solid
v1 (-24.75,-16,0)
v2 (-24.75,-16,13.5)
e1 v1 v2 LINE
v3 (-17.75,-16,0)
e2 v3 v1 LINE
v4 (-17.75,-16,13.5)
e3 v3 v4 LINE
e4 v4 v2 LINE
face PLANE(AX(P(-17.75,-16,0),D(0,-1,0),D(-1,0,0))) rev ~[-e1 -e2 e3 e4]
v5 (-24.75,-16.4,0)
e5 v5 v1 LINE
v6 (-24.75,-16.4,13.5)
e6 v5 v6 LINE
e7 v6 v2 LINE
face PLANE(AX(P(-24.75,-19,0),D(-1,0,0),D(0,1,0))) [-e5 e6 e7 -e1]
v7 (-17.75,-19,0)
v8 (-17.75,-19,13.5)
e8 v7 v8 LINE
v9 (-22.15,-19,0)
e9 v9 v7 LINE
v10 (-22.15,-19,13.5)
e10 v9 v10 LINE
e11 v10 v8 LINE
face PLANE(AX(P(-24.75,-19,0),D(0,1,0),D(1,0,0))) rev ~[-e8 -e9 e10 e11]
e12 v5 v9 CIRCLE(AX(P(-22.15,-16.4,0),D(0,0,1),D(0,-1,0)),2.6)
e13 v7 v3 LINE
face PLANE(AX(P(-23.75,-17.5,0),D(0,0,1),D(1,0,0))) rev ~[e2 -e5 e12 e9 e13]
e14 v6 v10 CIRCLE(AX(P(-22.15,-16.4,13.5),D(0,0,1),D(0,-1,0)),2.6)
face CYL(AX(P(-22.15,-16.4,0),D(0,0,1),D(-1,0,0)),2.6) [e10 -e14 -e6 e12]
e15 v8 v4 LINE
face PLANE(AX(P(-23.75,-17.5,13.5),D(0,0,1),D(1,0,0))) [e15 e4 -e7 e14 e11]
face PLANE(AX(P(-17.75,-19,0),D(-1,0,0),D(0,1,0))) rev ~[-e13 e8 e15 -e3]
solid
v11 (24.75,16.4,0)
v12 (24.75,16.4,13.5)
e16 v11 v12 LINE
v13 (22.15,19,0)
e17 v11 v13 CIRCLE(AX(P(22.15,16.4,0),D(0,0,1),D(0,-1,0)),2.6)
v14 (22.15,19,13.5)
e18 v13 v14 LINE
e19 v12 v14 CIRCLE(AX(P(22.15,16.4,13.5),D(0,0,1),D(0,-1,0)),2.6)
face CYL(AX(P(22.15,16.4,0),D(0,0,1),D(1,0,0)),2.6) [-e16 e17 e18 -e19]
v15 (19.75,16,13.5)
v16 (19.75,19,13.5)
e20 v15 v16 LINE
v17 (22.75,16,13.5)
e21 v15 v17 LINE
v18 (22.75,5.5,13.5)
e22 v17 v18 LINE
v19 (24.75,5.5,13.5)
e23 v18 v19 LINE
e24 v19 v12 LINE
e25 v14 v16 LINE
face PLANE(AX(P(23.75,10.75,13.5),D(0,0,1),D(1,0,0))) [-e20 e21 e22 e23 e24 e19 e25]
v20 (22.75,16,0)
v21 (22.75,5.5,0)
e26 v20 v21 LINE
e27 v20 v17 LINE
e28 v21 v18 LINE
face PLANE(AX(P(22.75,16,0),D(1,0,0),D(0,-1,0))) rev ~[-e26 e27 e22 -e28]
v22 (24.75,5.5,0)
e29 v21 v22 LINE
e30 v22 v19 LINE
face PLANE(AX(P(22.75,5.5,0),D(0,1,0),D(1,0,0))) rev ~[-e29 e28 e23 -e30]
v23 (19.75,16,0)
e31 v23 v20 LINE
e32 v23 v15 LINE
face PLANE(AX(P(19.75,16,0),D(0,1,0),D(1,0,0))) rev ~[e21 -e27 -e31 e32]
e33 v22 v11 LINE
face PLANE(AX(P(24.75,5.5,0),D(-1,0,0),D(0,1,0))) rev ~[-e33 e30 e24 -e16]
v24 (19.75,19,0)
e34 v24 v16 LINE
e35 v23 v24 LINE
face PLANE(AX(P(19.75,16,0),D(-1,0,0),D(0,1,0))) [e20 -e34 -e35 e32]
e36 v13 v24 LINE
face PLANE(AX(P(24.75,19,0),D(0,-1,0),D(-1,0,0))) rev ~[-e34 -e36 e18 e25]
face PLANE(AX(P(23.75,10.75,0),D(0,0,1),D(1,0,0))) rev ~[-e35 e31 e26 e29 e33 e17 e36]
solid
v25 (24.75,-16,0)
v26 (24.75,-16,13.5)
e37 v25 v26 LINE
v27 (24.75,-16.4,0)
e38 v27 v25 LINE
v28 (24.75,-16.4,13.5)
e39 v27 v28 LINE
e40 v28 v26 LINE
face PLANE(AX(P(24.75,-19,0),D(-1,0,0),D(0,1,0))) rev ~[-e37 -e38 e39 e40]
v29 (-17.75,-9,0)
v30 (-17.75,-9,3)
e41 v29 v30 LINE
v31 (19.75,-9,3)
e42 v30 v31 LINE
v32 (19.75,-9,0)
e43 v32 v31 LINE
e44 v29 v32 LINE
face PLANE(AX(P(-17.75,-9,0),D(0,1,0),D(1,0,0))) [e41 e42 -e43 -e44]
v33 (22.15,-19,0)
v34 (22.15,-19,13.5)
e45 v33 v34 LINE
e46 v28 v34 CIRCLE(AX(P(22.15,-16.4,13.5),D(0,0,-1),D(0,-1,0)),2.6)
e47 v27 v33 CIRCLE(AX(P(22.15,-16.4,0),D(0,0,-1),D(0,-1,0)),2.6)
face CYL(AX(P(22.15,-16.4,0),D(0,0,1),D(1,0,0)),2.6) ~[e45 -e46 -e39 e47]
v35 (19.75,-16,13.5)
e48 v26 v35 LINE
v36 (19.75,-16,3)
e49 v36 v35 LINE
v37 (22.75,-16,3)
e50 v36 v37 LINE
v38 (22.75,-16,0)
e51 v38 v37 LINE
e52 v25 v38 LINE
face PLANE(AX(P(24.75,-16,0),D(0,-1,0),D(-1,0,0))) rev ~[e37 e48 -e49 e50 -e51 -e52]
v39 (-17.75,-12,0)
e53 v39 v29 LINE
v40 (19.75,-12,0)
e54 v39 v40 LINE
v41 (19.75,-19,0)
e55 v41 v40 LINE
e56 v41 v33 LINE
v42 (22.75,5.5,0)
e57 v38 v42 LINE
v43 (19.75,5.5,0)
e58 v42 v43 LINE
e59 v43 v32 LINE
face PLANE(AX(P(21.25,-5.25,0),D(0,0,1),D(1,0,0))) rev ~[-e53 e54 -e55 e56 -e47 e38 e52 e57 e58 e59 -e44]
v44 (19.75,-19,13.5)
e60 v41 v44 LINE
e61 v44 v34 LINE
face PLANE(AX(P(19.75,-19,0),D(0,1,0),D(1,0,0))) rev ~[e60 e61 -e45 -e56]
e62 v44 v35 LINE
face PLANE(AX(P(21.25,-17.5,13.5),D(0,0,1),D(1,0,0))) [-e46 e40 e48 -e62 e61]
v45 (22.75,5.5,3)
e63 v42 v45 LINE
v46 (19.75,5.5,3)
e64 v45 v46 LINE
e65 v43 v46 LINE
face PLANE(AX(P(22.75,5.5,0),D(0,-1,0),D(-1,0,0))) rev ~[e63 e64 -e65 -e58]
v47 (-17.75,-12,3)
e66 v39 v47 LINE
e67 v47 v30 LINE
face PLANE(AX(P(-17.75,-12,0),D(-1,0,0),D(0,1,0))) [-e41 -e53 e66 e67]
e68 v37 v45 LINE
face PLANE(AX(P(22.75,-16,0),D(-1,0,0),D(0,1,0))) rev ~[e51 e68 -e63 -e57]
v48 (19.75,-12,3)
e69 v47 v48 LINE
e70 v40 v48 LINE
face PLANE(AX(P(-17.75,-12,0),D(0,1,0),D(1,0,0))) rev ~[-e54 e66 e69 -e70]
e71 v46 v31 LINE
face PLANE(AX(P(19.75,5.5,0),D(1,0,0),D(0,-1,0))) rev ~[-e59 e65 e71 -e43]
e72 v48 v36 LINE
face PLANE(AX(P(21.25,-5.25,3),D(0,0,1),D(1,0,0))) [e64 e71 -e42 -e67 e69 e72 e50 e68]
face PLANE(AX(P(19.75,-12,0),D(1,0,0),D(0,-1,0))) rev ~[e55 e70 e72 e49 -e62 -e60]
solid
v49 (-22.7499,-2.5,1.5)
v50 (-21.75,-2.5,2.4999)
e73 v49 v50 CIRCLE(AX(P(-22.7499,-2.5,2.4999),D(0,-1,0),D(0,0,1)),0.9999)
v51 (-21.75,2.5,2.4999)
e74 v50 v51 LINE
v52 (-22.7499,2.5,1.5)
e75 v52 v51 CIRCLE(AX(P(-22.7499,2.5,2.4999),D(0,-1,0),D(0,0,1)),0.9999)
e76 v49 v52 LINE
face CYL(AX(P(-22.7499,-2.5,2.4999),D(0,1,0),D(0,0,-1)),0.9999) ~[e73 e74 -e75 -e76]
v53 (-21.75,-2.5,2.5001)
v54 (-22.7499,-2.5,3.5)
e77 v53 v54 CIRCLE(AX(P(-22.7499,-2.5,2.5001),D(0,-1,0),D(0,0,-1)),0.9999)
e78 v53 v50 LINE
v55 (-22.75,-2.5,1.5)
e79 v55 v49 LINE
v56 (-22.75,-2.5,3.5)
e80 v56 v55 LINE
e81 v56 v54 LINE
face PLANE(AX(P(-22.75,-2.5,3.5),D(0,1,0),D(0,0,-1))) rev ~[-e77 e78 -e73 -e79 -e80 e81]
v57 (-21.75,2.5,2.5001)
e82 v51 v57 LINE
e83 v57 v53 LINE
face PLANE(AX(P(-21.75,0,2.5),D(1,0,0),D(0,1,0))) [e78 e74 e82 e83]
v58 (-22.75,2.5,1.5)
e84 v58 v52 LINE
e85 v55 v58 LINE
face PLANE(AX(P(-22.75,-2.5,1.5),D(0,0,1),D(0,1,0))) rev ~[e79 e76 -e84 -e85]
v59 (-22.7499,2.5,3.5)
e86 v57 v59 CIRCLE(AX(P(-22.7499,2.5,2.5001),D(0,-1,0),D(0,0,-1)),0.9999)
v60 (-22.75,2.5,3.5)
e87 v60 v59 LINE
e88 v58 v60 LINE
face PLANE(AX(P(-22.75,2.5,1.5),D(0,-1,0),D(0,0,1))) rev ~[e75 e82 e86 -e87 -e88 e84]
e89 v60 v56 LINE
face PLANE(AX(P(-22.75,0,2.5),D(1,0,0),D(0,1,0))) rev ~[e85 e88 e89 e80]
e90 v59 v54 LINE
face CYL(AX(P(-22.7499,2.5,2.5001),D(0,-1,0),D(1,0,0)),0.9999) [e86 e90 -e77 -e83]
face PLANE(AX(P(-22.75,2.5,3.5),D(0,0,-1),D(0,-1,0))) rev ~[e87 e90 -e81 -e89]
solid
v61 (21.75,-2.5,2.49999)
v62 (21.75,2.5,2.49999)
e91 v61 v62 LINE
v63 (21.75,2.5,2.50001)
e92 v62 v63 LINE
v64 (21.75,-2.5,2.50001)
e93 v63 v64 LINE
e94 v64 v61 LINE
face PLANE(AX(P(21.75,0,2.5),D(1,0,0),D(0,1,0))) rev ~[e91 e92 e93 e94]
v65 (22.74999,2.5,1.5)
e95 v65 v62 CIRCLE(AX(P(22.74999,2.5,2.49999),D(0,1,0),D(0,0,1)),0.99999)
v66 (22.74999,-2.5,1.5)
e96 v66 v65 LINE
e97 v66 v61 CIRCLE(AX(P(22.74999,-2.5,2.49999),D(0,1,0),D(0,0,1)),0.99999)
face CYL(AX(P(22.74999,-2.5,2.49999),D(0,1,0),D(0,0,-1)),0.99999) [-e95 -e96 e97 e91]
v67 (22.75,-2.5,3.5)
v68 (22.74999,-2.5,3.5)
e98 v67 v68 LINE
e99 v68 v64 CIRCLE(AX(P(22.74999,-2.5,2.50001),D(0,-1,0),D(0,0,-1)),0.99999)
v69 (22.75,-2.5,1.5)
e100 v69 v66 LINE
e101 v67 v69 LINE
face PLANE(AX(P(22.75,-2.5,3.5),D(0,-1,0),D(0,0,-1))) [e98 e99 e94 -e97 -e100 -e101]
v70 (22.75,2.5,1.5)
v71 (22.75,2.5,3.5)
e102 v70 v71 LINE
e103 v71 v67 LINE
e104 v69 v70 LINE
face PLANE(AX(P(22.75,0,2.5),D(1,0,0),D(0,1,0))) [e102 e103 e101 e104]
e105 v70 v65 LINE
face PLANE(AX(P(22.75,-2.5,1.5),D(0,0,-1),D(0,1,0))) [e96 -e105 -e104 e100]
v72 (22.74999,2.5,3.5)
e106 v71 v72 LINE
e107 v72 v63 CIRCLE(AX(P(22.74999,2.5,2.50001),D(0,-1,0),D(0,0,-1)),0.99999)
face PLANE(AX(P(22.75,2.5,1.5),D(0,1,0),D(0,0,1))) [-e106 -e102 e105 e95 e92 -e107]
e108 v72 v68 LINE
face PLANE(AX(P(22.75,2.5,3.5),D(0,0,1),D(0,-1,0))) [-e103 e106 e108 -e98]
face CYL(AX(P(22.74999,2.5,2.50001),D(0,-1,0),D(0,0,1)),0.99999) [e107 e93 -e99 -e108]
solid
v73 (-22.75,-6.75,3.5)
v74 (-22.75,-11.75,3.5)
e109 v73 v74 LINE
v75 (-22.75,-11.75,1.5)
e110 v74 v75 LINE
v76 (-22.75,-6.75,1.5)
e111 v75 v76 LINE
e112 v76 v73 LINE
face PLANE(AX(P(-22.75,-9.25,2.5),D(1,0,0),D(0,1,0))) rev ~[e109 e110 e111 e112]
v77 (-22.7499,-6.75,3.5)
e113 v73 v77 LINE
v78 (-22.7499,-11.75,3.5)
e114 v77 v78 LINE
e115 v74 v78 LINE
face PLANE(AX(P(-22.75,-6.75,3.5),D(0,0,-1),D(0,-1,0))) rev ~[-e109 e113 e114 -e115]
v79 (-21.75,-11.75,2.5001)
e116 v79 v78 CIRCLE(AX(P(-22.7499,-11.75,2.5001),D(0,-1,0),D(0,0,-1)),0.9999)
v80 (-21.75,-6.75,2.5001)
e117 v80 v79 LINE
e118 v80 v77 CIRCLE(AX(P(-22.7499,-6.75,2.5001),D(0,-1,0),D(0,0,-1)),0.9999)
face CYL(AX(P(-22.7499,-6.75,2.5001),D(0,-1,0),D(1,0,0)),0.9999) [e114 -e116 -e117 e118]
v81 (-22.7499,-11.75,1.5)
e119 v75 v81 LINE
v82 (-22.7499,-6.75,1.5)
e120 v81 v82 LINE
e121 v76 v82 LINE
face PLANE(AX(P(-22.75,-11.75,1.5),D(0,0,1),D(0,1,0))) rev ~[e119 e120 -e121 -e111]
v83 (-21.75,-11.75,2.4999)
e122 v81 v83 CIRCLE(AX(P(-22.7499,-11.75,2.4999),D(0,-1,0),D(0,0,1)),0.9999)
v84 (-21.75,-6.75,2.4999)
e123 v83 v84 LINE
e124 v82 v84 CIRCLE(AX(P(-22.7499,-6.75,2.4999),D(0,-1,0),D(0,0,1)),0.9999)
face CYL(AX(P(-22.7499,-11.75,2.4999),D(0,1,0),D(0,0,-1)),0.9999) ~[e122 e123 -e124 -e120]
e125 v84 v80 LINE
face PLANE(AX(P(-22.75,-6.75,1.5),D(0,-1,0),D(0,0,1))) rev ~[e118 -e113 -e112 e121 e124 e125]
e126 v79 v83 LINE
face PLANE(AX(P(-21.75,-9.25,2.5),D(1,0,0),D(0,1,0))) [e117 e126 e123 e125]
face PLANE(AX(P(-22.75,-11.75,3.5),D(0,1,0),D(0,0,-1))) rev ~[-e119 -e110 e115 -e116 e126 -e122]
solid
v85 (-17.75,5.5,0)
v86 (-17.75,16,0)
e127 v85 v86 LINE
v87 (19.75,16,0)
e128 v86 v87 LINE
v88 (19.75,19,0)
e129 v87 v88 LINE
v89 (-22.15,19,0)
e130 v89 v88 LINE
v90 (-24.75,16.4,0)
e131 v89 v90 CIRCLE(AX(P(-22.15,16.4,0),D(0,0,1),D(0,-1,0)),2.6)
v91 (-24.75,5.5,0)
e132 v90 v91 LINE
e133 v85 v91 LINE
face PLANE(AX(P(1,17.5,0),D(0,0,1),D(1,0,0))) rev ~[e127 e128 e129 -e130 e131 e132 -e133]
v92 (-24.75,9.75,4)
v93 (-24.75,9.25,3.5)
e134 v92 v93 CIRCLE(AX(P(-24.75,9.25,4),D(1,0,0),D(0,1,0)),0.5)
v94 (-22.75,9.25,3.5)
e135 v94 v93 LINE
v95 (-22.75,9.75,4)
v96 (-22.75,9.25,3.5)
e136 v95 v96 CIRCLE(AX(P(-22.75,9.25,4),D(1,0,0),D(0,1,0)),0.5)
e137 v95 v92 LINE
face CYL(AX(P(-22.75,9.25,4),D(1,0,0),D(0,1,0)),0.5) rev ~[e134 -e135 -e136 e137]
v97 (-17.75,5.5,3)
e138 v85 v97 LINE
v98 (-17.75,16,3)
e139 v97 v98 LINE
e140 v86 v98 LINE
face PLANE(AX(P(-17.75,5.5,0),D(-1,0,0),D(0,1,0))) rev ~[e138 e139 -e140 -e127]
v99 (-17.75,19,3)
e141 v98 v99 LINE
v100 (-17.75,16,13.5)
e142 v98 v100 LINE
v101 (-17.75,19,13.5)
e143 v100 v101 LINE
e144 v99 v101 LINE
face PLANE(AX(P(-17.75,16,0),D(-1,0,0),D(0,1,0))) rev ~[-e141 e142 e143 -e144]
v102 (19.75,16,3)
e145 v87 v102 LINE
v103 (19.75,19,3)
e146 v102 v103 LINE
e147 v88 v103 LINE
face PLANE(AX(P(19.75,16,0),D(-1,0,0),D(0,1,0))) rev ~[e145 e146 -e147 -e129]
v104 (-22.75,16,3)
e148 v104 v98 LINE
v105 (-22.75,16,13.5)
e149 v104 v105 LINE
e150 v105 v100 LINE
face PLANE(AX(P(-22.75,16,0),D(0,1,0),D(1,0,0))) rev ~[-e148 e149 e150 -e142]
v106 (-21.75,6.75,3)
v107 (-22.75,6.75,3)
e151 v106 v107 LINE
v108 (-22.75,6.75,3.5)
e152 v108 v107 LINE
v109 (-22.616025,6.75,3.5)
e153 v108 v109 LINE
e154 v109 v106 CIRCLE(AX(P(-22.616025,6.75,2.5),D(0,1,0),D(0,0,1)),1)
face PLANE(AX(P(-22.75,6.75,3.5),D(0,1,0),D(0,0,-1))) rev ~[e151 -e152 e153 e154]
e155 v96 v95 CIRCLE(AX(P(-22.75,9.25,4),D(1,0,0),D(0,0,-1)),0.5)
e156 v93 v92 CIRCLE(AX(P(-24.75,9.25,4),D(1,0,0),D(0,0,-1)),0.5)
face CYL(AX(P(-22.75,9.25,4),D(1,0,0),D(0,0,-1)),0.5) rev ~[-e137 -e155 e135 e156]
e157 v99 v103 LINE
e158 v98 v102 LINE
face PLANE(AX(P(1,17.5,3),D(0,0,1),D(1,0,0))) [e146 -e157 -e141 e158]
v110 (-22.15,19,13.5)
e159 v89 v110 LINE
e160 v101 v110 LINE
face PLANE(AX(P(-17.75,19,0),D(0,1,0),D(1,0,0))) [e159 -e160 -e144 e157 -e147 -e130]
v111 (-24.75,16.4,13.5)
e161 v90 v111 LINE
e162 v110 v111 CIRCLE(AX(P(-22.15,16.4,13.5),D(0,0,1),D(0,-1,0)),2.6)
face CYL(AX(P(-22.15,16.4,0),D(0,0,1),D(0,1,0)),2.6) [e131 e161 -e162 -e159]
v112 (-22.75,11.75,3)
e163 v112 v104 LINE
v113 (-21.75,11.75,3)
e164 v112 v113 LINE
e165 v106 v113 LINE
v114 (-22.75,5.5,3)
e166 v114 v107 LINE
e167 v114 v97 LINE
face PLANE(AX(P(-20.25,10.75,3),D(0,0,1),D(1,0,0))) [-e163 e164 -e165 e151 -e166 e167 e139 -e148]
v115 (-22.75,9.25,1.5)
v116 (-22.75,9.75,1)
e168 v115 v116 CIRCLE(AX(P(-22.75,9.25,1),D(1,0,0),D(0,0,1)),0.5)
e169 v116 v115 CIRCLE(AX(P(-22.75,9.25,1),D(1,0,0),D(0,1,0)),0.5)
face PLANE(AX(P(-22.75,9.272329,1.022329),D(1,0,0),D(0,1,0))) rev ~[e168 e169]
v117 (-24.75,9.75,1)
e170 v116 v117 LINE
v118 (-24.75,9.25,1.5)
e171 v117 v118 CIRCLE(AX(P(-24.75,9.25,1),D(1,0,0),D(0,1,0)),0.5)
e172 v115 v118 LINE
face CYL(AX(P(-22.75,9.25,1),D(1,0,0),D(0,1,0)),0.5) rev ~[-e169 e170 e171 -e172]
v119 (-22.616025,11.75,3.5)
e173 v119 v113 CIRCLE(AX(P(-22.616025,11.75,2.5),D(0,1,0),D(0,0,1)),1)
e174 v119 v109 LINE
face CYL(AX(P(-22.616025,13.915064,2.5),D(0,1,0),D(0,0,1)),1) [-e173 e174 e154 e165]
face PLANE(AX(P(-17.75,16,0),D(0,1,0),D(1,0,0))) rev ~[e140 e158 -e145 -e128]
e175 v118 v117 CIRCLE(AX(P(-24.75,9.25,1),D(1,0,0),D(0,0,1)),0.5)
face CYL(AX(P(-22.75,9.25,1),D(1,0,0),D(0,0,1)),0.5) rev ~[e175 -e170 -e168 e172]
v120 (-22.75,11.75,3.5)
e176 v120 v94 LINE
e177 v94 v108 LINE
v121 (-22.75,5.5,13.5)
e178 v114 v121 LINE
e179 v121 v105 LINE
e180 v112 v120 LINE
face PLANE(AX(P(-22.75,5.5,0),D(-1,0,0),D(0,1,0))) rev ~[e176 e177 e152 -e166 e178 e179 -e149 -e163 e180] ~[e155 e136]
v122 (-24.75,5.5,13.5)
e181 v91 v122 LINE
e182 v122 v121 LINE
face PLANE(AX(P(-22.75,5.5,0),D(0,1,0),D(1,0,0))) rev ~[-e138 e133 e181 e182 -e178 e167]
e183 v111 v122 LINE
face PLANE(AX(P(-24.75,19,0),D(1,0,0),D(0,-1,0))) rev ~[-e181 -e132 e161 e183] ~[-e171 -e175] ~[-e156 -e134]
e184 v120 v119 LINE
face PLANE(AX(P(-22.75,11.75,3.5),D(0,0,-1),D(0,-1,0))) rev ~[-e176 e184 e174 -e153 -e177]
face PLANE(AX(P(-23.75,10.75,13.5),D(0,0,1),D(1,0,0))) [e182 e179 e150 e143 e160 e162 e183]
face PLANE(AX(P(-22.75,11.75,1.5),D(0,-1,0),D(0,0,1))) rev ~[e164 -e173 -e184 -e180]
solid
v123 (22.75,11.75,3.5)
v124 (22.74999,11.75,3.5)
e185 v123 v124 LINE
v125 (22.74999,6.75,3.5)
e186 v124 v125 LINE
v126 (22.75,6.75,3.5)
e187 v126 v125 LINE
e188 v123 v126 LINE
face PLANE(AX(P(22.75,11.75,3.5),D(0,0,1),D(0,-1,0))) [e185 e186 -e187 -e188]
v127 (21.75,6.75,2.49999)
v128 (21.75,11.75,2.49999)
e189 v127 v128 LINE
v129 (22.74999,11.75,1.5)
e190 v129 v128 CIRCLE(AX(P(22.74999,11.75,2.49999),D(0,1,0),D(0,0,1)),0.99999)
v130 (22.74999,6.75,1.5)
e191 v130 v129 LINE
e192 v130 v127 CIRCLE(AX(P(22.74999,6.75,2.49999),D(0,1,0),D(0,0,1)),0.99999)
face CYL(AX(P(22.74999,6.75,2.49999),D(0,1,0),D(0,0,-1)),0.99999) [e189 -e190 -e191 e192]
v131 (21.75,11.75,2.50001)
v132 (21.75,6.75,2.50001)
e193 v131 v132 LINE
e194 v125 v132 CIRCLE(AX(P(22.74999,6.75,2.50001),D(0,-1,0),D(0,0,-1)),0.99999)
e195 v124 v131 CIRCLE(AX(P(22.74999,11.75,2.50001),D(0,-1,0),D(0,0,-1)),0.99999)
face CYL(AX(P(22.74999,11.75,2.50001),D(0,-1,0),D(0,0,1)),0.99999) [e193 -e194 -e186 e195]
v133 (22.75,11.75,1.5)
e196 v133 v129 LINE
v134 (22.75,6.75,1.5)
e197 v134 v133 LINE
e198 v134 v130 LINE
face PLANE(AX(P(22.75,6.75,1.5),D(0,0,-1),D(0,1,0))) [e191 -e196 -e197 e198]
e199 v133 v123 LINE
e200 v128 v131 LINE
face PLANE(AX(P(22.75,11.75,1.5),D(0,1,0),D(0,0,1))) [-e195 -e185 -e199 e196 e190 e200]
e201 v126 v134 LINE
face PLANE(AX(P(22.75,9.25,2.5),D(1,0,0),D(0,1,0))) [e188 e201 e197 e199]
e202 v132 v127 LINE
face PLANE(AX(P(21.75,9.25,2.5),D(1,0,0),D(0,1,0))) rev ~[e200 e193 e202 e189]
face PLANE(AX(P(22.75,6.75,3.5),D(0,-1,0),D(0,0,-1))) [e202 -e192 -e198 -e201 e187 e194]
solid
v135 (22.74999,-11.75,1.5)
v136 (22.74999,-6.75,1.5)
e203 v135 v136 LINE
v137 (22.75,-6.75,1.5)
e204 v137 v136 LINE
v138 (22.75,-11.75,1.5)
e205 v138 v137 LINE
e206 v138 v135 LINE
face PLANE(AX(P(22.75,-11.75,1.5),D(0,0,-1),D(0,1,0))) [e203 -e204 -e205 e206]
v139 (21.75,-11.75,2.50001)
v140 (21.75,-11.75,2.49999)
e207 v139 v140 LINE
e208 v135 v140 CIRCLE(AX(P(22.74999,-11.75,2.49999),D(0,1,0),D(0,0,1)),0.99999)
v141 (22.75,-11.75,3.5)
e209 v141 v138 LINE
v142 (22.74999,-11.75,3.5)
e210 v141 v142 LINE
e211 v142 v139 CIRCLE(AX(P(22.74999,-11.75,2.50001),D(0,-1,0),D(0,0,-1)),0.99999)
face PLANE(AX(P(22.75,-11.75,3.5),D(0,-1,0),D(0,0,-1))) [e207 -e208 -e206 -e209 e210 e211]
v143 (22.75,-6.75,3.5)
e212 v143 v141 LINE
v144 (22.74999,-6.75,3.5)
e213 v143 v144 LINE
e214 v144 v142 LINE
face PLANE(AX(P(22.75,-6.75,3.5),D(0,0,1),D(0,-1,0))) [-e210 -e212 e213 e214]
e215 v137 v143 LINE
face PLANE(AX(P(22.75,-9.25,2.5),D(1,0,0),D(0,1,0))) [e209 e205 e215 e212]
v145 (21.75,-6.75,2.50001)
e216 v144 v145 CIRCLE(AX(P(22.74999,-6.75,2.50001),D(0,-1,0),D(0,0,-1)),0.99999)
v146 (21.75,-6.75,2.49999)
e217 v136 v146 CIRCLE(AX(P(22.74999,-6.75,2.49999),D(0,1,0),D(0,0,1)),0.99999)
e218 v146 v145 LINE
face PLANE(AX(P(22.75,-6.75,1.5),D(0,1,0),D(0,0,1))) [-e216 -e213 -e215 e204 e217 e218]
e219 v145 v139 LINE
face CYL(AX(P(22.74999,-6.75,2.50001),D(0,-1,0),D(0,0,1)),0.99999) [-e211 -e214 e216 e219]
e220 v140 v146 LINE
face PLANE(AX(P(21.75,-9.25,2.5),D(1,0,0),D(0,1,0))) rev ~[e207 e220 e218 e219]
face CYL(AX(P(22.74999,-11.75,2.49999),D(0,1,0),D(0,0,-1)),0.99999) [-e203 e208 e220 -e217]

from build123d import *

# Parameters (mm, degrees)
F0_W         = 2
F0_H         = 10.5
F0_H_2       = 3
F0_W_2       = 5
F1_DEPTH     = 13.5
F0_W_3       = 3
F0_W_4       = 37.5
F2_DEPTH     = 3
F3_R         = 2.6
F3_2_R       = 2.6
F3_3_R       = 2.6
F3_4_R       = 2.6
F6_DEPTH     = 1
F7_R         = 0.99999
F7_2_R       = 0.99999
F7_3_R       = 0.99999
F10_DEPTH    = 1
F11_T1_DEPTH = 9.3301270189
F11_2_F1_R   = 0.9999
F11_2_F2_R   = 0.9999
F11_3_F1_R   = 0.9999
F11_3_F2_R   = 0.9999
F12_DEPTH    = 5
F13_DEPTH    = 5


# Not quite as in the source:
# - a fillet or chamfer that OpenCascade refuses, or shapes differently, is made with other operations: its cross-section is extruded or revolved along the edge and cut away or added
# - a fillet or chamfer is up to 0.001 mm smaller than in the source, because OpenCascade refuses the exact size
# - a feature of the source that left no trace in its solid (it failed there, or was rolled back) is left out
# - a feature names something its author has since deleted; it is built from what else it names


with BuildPart() as f1:
    # F0 (on Top) → F1 (new body)
    with BuildSketch(Plane.XY):
        with Locations((-23.75, 10.75)):
            Rectangle(F0_W, F0_H)
        with Locations((-23.75, 17.5)):
            Rectangle(F0_W, F0_H_2)
        with Locations((-20.25, 17.5)):
            Rectangle(F0_W_2, F0_H_2)
    extrude(amount=F1_DEPTH)

    # F0 (on Top) → F2 (join)
    with BuildSketch(Plane.XY):
        with Locations((1, 17.5)):
            Rectangle(F0_W_4, F0_H_2)
        with Locations((-20.25, 10.75)):
            Rectangle(F0_W_2, F0_H)
    extrude(amount=F2_DEPTH)

    # F3
    f3_edges = [f1.edges().sort_by_distance(p)[0] for p in [
        (-24.75, 19, 6.75),
    ]]
    fillet(f3_edges, radius=F3_R)

    # F9 (on face) → F10, piece 3 (join)
    with BuildSketch(Plane.YZ.offset(-22.75)):
        Polygon((6.75, 3.5), (6.75, 1.5), (9.25, 1.5), (11.75, 1.5), (11.75, 3.5), (9.25, 3.5), align=None)
    extrude(amount=F10_DEPTH)

    # F11: fillet of radius 1 on 1 edges, made by hand

    # F11_s2 → F11_t1 (cut)
    with BuildSketch(Plane.XZ.offset(-13.9150635095)):
        with BuildLine():
            ThreePointArc((-22.6160254038, 3.5), (-22.1160254038, 3.3660254038), (-21.75, 3))
            Line((-21.75, 3), (-21.75, 3.5))
            Line((-21.75, 3.5), (-22.6160254038, 3.5))
        make_face()
    extrude(amount=F11_T1_DEPTH, mode=Mode.SUBTRACT)

    # F5 (on face) → F12 (cut)
    with BuildSketch(Plane.YZ.offset(22.75)):
        with BuildLine():
            ThreePointArc((-8.75, 4), (-9.6035533906, 4.3535533906), (-9.25, 3.5))
            ThreePointArc((-9.25, 3.5), (-8.8964466094, 3.6464466094), (-8.75, 4))
        make_face()
        with BuildLine():
            ThreePointArc((-8.75, 1), (-8.8964466094, 1.3535533906), (-9.25, 1.5))
            ThreePointArc((-9.25, 1.5), (-9.6035533906, 0.6464466094), (-8.75, 1))
        make_face()
        with BuildLine():
            ThreePointArc((0.5, 4), (-0.3535533906, 4.3535533906), (0, 3.5))
            ThreePointArc((0, 3.5), (0.3535533906, 3.6464466094), (0.5, 4))
        make_face()
        with BuildLine():
            ThreePointArc((0.5, 1), (0.3535533906, 1.3535533906), (0, 1.5))
            ThreePointArc((0, 1.5), (-0.3535533906, 0.6464466094), (0.5, 1))
        make_face()
    extrude(amount=F12_DEPTH, mode=Mode.SUBTRACT)

    # F9 (on face) → F13 (cut)
    with BuildSketch(Plane.YZ.offset(-22.75)):
        with BuildLine():
            ThreePointArc((-8.75, 4), (-9.6035533906, 4.3535533906), (-9.25, 3.5))
            ThreePointArc((-9.25, 3.5), (-8.8964466094, 3.6464466094), (-8.75, 4))
        make_face()
        with BuildLine():
            ThreePointArc((0.5, 4), (-0.3535533906, 4.3535533906), (0, 3.5))
            ThreePointArc((0, 3.5), (0.3535533906, 3.6464466094), (0.5, 4))
        make_face()
        with BuildLine():
            ThreePointArc((9.75, 4), (8.8964466094, 4.3535533906), (9.25, 3.5))
            ThreePointArc((9.25, 3.5), (9.6035533906, 3.6464466094), (9.75, 4))
        make_face()
        with BuildLine():
            ThreePointArc((9.75, 1), (9.6035533906, 1.3535533906), (9.25, 1.5))
            ThreePointArc((9.25, 1.5), (8.8964466094, 0.6464466094), (9.75, 1))
        make_face()
        with BuildLine():
            ThreePointArc((0.5, 1), (0.3535533906, 1.3535533906), (0, 1.5))
            ThreePointArc((0, 1.5), (-0.3535533906, 0.6464466094), (0.5, 1))
        make_face()
        with BuildLine():
            ThreePointArc((-8.75, 1), (-8.8964466094, 1.3535533906), (-9.25, 1.5))
            ThreePointArc((-9.25, 1.5), (-9.6035533906, 0.6464466094), (-8.75, 1))
        make_face()
    extrude(amount=-F13_DEPTH, mode=Mode.SUBTRACT)


with BuildPart() as f1b:
    # F0 (on Top) → F1, piece 2 (new body)
    with BuildSketch(Plane.XY):
        with Locations((-23.75, -17.5)):
            Rectangle(F0_W, F0_H_2)
        with Locations((-20.25, -17.5)):
            Rectangle(F0_W_2, F0_H_2)
    extrude(amount=F1_DEPTH)

    # F3#2
    f3_2_edges = [f1b.edges().sort_by_distance(p)[0] for p in [
        (-24.75, -19, 6.75),
    ]]
    fillet(f3_2_edges, radius=F3_2_R)


with BuildPart() as f1c:
    # F0 (on Top) → F1, piece 3 (new body)
    with BuildSketch(Plane.XY):
        with Locations((21.25, -17.5)):
            Rectangle(F0_W_3, F0_H_2)
        with Locations((23.75, -17.5)):
            Rectangle(F0_W, F0_H_2)
    extrude(amount=F1_DEPTH)

    # F0 (on Top) → F2, piece 2 (join)
    with BuildSketch(Plane.XY):
        Polygon((22.75, 5.5), (19.75, 5.5), (19.75, -9), (19.75, -12), (19.75, -16), (22.75, -16), align=None)
        with Locations((1, -10.5)):
            Rectangle(F0_W_4, F0_H_2)
    extrude(amount=F2_DEPTH)

    # F3#3
    f3_3_edges = [f1c.edges().sort_by_distance(p)[0] for p in [
        (24.75, -19, 6.75),
    ]]
    fillet(f3_3_edges, radius=F3_3_R)


with BuildPart() as f1d:
    # F0 (on Top) → F1, piece 4 (new body)
    with BuildSketch(Plane.XY):
        with Locations((23.75, 10.75)):
            Rectangle(F0_W, F0_H)
        with Locations((23.75, 17.5)):
            Rectangle(F0_W, F0_H_2)
        with Locations((21.25, 17.5)):
            Rectangle(F0_W_3, F0_H_2)
    extrude(amount=F1_DEPTH)

    # F3#4
    f3_4_edges = [f1d.edges().sort_by_distance(p)[0] for p in [
        (24.75, 19, 6.75),
    ]]
    fillet(f3_4_edges, radius=F3_4_R)


with BuildPart() as f6:
    # F5 (on face) → F6 (new body)
    with BuildSketch(Plane.YZ.offset(22.75)):
        Polygon((-11.75, 3.5), (-11.75, 1.5), (-9.25, 1.5), (-6.75, 1.5), (-6.75, 3.5), (-9.25, 3.5), align=None)
    extrude(amount=-F6_DEPTH)

    # F7 (radius 1 in the source; OpenCascade refuses exactly that, so slightly less here)
    f7_edges = [f6.edges().sort_by_distance(p)[0] for p in [
        (21.75, -9.25, 3.5),
        (21.75, -9.25, 1.5),
    ]]
    fillet(f7_edges, radius=F7_R)


with BuildPart() as f6b:
    # F5 (on face) → F6, piece 2 (new body)
    with BuildSketch(Plane.YZ.offset(22.75)):
        Polygon((-2.5, 3.5), (-2.5, 1.5), (0, 1.5), (2.5, 1.5), (2.5, 3.5), (0, 3.5), align=None)
    extrude(amount=-F6_DEPTH)

    # F7#2 (radius 1 in the source; OpenCascade refuses exactly that, so slightly less here)
    f7_2_edges = [f6b.edges().sort_by_distance(p)[0] for p in [
        (21.75, 0, 3.5),
        (21.75, 0, 1.5),
    ]]
    fillet(f7_2_edges, radius=F7_2_R)


with BuildPart() as f6c:
    # F5 (on face) → F6, piece 3 (new body)
    with BuildSketch(Plane.YZ.offset(22.75)):
        Polygon((6.75, 3.5), (6.75, 1.5), (9.25, 1.5), (11.75, 1.5), (11.75, 3.5), (9.25, 3.5), align=None)
    extrude(amount=-F6_DEPTH)

    # F7#3 (radius 1 in the source; OpenCascade refuses exactly that, so slightly less here)
    f7_3_edges = [f6c.edges().sort_by_distance(p)[0] for p in [
        (21.75, 9.25, 1.5),
        (21.75, 9.25, 3.5),
    ]]
    fillet(f7_3_edges, radius=F7_3_R)


with BuildPart() as f10:
    # F9 (on face) → F10 (new body)
    with BuildSketch(Plane.YZ.offset(-22.75)):
        Polygon((-11.75, 3.5), (-11.75, 1.5), (-9.25, 1.5), (-6.75, 1.5), (-6.75, 3.5), (-9.25, 3.5), align=None)
    extrude(amount=F10_DEPTH)

    # F11#2: fillet of radius 1 on 2 edges, made by hand

    # F11_2_f1 (radius 1 in the source; OpenCascade refuses exactly that, so slightly less here)
    f11_2_f1_edges = [f10.edges().sort_by_distance(p)[0] for p in [
        (-21.75, -9.25, 1.5),
    ]]
    fillet(f11_2_f1_edges, radius=F11_2_F1_R)

    # F11_2_f2 (radius 1 in the source; OpenCascade refuses exactly that, so slightly less here)
    f11_2_f2_edges = [f10.edges().sort_by_distance(p)[0] for p in [
        (-21.75, -9.25, 3.5),
    ]]
    fillet(f11_2_f2_edges, radius=F11_2_F2_R)


with BuildPart() as f10b:
    # F9 (on face) → F10, piece 2 (new body)
    with BuildSketch(Plane.YZ.offset(-22.75)):
        Polygon((-2.5, 3.5), (-2.5, 1.5), (0, 1.5), (2.5, 1.5), (2.5, 3.5), (0, 3.5), align=None)
    extrude(amount=F10_DEPTH)

    # F11#3: fillet of radius 1 on 2 edges, made by hand

    # F11_3_f1 (radius 1 in the source; OpenCascade refuses exactly that, so slightly less here)
    f11_3_f1_edges = [f10b.edges().sort_by_distance(p)[0] for p in [
        (-21.75, 0, 1.5),
    ]]
    fillet(f11_3_f1_edges, radius=F11_3_F1_R)

    # F11_3_f2 (radius 1 in the source; OpenCascade refuses exactly that, so slightly less here)
    f11_3_f2_edges = [f10b.edges().sort_by_distance(p)[0] for p in [
        (-21.75, 0, 3.5),
    ]]
    fillet(f11_3_f2_edges, radius=F11_3_F2_R)


solid = Compound([f1.part, f1b.part, f1c.part, f1d.part, f6.part, f6b.part, f6c.part, f10.part, f10b.part])
